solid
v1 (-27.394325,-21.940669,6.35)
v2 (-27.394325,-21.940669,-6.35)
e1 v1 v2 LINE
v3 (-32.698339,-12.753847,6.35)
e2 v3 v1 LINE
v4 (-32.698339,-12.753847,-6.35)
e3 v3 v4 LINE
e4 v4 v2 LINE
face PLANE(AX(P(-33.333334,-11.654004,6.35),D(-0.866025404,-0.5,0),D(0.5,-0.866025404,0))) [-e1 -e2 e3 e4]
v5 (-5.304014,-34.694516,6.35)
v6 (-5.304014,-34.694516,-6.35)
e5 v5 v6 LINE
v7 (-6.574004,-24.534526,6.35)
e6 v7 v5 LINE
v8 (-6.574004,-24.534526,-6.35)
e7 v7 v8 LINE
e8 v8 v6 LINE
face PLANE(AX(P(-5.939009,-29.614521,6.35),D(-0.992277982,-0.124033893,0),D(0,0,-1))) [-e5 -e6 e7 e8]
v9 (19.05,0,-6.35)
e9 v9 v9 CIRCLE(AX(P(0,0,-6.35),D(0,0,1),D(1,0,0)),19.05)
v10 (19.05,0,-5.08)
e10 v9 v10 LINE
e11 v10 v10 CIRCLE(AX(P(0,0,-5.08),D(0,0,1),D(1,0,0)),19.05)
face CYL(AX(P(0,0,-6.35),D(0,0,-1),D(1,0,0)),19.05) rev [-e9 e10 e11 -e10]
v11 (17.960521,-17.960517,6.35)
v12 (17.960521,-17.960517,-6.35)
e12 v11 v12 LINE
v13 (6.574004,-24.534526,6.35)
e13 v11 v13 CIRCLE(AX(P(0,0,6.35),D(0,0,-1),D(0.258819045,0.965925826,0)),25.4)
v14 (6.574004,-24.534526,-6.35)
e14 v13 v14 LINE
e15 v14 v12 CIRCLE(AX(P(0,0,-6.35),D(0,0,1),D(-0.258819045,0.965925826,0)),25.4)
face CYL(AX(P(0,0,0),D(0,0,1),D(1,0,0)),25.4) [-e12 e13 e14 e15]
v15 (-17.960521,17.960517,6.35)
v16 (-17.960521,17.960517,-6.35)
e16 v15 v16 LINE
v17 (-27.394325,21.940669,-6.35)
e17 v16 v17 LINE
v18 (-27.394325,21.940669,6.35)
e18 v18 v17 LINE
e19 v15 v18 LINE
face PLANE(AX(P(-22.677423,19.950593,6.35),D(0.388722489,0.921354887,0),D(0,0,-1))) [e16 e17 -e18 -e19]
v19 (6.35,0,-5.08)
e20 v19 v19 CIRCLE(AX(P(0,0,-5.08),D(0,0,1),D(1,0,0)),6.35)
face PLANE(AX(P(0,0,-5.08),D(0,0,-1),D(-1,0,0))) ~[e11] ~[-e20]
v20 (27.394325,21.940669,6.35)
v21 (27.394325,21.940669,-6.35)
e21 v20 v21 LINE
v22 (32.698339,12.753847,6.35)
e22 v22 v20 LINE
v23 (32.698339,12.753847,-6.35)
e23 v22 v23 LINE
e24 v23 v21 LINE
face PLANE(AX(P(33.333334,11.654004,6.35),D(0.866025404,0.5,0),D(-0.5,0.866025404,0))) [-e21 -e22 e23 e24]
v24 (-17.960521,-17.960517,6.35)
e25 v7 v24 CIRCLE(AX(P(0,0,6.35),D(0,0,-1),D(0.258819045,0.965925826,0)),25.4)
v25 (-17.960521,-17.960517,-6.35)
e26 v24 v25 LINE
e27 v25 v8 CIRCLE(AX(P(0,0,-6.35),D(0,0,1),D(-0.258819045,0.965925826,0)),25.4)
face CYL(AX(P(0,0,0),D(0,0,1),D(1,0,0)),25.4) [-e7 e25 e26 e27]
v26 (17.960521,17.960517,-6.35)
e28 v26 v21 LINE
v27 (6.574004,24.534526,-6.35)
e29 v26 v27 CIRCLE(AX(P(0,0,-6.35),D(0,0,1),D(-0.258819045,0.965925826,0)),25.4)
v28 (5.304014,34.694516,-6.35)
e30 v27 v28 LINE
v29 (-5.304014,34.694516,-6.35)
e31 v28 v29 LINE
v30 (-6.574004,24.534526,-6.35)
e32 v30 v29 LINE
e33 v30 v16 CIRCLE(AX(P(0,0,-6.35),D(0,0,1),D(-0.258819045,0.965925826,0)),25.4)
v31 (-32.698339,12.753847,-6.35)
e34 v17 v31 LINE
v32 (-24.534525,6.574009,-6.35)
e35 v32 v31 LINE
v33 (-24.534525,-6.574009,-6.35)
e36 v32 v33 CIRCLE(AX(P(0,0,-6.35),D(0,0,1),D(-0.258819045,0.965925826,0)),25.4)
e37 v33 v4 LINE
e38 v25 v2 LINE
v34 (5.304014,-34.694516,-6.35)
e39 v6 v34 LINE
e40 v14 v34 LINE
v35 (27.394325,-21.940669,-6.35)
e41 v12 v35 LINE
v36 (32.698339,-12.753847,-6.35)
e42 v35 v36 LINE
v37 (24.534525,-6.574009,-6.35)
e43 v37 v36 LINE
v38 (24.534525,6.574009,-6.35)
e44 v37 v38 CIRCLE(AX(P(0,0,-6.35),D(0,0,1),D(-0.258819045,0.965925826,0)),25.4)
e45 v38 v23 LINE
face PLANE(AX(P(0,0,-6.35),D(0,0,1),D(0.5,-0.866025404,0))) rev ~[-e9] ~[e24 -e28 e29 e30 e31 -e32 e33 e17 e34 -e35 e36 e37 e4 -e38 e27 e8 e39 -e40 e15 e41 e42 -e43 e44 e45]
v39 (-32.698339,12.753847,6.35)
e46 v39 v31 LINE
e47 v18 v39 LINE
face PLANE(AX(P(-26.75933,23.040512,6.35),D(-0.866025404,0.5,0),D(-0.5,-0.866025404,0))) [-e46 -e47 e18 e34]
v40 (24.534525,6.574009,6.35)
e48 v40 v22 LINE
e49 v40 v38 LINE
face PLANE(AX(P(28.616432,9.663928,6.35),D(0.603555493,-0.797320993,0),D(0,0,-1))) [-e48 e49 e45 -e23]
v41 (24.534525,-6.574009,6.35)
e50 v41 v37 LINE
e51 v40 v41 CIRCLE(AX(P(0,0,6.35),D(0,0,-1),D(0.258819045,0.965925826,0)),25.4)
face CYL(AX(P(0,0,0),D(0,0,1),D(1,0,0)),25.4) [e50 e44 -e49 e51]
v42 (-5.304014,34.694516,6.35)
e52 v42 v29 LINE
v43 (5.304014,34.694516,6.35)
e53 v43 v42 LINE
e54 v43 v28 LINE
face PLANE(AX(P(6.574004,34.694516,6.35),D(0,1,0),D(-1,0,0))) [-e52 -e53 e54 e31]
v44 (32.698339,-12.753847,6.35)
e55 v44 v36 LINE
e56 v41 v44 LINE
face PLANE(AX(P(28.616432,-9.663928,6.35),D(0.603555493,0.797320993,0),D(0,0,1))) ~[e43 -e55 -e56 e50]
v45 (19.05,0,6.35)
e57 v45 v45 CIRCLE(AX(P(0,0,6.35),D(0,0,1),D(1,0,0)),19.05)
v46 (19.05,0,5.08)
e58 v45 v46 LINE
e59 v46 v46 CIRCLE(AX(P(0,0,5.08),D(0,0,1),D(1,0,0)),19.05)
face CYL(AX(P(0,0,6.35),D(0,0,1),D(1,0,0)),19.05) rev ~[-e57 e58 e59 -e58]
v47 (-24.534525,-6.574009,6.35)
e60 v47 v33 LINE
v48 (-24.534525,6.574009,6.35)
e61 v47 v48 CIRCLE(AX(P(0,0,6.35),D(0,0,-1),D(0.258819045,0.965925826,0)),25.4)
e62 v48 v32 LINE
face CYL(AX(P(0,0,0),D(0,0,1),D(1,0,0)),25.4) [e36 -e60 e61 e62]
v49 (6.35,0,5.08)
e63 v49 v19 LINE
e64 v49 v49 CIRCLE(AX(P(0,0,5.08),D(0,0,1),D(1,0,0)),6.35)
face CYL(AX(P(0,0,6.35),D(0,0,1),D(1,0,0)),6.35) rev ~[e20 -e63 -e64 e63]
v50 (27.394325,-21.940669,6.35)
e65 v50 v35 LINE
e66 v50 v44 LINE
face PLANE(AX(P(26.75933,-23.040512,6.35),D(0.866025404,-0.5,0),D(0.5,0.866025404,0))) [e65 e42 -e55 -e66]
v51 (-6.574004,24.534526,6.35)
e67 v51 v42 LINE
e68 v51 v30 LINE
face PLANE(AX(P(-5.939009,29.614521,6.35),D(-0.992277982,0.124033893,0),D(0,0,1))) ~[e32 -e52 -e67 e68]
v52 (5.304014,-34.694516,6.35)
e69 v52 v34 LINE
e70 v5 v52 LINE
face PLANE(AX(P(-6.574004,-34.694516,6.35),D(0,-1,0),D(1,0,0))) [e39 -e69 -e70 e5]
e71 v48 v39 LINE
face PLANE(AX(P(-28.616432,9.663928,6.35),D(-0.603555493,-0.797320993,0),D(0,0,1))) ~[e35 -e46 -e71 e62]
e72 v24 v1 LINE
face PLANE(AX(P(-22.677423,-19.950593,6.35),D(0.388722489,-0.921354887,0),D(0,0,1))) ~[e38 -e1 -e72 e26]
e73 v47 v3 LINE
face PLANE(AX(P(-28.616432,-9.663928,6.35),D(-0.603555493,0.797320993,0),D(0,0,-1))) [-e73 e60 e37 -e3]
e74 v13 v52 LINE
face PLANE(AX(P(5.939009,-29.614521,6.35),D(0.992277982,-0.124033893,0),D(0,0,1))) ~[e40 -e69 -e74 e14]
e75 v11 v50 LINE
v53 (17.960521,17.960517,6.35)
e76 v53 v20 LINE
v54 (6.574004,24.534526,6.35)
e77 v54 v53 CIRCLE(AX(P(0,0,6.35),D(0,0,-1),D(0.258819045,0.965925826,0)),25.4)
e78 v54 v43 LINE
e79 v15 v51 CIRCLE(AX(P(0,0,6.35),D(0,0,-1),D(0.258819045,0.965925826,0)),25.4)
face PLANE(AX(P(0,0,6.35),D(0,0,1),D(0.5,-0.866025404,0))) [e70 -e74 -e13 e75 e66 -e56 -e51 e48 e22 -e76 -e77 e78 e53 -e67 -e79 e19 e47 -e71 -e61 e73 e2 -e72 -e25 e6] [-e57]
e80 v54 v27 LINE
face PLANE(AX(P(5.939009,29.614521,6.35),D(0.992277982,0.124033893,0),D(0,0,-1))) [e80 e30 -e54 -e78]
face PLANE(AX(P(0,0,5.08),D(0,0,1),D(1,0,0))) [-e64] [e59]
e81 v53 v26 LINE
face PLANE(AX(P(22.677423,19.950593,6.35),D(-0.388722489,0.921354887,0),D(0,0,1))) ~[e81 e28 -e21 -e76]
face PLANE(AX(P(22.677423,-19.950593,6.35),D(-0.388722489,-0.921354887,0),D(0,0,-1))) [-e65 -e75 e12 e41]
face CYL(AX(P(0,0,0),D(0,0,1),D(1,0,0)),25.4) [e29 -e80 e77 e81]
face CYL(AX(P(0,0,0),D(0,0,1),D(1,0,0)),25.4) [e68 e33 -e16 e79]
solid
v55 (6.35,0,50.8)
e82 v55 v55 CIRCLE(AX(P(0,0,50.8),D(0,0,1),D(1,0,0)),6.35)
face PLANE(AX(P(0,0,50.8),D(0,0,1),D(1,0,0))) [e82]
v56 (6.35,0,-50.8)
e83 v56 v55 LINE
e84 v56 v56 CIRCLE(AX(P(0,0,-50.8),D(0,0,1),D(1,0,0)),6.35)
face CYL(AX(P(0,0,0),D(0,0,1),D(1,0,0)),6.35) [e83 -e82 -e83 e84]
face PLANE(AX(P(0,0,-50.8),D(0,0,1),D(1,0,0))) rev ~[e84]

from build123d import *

# Parameters (mm, degrees)
F0_R       = 25.4
F1_DEPTH   = 6.35
F3_DEPTH   = 12.7
F4_SIZE2   = 1.26999
F4_SIZE    = 10.15999
F4_2_SIZE2 = 1.26999
F4_2_SIZE  = 10.15999
F6_COUNT   = 6
F7_R       = 19.05
F7_R_2     = 6.35
F8_DEPTH   = 1.27
F9_DEPTH   = 25.4
F10_R      = 6.35
F11_DEPTH  = 50.8


# Not quite as in the source:
# - a fillet or chamfer is up to 0.001 mm smaller than in the source, because OpenCascade refuses the exact size
# - a pattern or mirror of a feature is missing from the dataset's text; its kind, count and spacing are read off the source's solid


with BuildPart() as f1:
    # F0 (on Top) → F1 (new body, symmetric)
    with BuildSketch(Plane.XY):
        Circle(F0_R)
    extrude(amount=F1_DEPTH, both=True)

    # F2 (on face) → F3 (join)
    with BuildSketch(Plane.XY.offset(6.35)):
        with BuildLine():
            ThreePointArc((-6.5740037456, 24.5345159877), (0, 25.4), (6.5740037456, 24.5345159877))
            Line((6.5740037456, 24.5345159877), (6.5740037456, 34.6945159877))
            Line((6.5740037456, 34.6945159877), (-6.5740037456, 34.6945159877))
            Line((-6.5740037456, 34.6945159877), (-6.5740037456, 24.5345159877))
        make_face()
    extrude(amount=-F3_DEPTH)

    # F4 (size 10.16 and 1.27 in the source; OpenCascade refuses exactly that, so slightly less here)
    f4_edges = [f1.edges().sort_by_distance(p)[0] for p in [
        (6.574004, 34.694516, 0),
    ]]
    f4_side = f1.faces().sort_by_distance((6.574004, 29.614516, 0))[0]
    chamfer(f4_edges, length=F4_SIZE, length2=F4_SIZE2, reference=f4_side)

    # F4#2 (size 10.16 and 1.27 in the source; OpenCascade refuses exactly that, so slightly less here)
    f4_2_edges = [f1.edges().sort_by_distance(p)[0] for p in [
        (-6.574004, 34.694516, 0),
    ]]
    f4_2_side = f1.faces().sort_by_distance((-6.574004, 29.614516, 0))[0]
    chamfer(f4_2_edges, length=F4_2_SIZE, length2=F4_2_SIZE2, reference=f4_2_side)

    # F6: F1 ×6 about axis
    f6_axis = Axis((0, 0, 22.000901401), (0, 0, 1))


with BuildPart() as f1_1:
    add(f1.part)
    for i in range(1, F6_COUNT):
        add(f1.part.rotate(f6_axis, i * 360 / F6_COUNT))

    # F7 (on face) → F8 (cut)
    with BuildSketch(Plane.XY.offset(6.35)):
        Circle(F7_R)
        Circle(F7_R_2, mode=Mode.SUBTRACT)
        Circle(F7_R_2)
    f8 = extrude(amount=-F8_DEPTH, mode=Mode.SUBTRACT)

    # F8_copies: F8 across plane
    add(f8.mirror(Plane(origin=(0, 0, 0), x_dir=(-1, 0, 0), z_dir=(0, 0, -1))), mode=Mode.SUBTRACT)

    # F7 (on face) → F9 (cut)
    with BuildSketch(Plane.XY.offset(6.35)):
        Circle(F7_R_2)
    extrude(amount=-F9_DEPTH, mode=Mode.SUBTRACT)


with BuildPart() as f11:
    # F10 (on Top) → F11 (new body, symmetric)
    with BuildSketch(Plane.XY):
        Circle(F10_R)
    extrude(amount=F11_DEPTH, both=True)


solid = Compound([f1_1.part, f11.part])
